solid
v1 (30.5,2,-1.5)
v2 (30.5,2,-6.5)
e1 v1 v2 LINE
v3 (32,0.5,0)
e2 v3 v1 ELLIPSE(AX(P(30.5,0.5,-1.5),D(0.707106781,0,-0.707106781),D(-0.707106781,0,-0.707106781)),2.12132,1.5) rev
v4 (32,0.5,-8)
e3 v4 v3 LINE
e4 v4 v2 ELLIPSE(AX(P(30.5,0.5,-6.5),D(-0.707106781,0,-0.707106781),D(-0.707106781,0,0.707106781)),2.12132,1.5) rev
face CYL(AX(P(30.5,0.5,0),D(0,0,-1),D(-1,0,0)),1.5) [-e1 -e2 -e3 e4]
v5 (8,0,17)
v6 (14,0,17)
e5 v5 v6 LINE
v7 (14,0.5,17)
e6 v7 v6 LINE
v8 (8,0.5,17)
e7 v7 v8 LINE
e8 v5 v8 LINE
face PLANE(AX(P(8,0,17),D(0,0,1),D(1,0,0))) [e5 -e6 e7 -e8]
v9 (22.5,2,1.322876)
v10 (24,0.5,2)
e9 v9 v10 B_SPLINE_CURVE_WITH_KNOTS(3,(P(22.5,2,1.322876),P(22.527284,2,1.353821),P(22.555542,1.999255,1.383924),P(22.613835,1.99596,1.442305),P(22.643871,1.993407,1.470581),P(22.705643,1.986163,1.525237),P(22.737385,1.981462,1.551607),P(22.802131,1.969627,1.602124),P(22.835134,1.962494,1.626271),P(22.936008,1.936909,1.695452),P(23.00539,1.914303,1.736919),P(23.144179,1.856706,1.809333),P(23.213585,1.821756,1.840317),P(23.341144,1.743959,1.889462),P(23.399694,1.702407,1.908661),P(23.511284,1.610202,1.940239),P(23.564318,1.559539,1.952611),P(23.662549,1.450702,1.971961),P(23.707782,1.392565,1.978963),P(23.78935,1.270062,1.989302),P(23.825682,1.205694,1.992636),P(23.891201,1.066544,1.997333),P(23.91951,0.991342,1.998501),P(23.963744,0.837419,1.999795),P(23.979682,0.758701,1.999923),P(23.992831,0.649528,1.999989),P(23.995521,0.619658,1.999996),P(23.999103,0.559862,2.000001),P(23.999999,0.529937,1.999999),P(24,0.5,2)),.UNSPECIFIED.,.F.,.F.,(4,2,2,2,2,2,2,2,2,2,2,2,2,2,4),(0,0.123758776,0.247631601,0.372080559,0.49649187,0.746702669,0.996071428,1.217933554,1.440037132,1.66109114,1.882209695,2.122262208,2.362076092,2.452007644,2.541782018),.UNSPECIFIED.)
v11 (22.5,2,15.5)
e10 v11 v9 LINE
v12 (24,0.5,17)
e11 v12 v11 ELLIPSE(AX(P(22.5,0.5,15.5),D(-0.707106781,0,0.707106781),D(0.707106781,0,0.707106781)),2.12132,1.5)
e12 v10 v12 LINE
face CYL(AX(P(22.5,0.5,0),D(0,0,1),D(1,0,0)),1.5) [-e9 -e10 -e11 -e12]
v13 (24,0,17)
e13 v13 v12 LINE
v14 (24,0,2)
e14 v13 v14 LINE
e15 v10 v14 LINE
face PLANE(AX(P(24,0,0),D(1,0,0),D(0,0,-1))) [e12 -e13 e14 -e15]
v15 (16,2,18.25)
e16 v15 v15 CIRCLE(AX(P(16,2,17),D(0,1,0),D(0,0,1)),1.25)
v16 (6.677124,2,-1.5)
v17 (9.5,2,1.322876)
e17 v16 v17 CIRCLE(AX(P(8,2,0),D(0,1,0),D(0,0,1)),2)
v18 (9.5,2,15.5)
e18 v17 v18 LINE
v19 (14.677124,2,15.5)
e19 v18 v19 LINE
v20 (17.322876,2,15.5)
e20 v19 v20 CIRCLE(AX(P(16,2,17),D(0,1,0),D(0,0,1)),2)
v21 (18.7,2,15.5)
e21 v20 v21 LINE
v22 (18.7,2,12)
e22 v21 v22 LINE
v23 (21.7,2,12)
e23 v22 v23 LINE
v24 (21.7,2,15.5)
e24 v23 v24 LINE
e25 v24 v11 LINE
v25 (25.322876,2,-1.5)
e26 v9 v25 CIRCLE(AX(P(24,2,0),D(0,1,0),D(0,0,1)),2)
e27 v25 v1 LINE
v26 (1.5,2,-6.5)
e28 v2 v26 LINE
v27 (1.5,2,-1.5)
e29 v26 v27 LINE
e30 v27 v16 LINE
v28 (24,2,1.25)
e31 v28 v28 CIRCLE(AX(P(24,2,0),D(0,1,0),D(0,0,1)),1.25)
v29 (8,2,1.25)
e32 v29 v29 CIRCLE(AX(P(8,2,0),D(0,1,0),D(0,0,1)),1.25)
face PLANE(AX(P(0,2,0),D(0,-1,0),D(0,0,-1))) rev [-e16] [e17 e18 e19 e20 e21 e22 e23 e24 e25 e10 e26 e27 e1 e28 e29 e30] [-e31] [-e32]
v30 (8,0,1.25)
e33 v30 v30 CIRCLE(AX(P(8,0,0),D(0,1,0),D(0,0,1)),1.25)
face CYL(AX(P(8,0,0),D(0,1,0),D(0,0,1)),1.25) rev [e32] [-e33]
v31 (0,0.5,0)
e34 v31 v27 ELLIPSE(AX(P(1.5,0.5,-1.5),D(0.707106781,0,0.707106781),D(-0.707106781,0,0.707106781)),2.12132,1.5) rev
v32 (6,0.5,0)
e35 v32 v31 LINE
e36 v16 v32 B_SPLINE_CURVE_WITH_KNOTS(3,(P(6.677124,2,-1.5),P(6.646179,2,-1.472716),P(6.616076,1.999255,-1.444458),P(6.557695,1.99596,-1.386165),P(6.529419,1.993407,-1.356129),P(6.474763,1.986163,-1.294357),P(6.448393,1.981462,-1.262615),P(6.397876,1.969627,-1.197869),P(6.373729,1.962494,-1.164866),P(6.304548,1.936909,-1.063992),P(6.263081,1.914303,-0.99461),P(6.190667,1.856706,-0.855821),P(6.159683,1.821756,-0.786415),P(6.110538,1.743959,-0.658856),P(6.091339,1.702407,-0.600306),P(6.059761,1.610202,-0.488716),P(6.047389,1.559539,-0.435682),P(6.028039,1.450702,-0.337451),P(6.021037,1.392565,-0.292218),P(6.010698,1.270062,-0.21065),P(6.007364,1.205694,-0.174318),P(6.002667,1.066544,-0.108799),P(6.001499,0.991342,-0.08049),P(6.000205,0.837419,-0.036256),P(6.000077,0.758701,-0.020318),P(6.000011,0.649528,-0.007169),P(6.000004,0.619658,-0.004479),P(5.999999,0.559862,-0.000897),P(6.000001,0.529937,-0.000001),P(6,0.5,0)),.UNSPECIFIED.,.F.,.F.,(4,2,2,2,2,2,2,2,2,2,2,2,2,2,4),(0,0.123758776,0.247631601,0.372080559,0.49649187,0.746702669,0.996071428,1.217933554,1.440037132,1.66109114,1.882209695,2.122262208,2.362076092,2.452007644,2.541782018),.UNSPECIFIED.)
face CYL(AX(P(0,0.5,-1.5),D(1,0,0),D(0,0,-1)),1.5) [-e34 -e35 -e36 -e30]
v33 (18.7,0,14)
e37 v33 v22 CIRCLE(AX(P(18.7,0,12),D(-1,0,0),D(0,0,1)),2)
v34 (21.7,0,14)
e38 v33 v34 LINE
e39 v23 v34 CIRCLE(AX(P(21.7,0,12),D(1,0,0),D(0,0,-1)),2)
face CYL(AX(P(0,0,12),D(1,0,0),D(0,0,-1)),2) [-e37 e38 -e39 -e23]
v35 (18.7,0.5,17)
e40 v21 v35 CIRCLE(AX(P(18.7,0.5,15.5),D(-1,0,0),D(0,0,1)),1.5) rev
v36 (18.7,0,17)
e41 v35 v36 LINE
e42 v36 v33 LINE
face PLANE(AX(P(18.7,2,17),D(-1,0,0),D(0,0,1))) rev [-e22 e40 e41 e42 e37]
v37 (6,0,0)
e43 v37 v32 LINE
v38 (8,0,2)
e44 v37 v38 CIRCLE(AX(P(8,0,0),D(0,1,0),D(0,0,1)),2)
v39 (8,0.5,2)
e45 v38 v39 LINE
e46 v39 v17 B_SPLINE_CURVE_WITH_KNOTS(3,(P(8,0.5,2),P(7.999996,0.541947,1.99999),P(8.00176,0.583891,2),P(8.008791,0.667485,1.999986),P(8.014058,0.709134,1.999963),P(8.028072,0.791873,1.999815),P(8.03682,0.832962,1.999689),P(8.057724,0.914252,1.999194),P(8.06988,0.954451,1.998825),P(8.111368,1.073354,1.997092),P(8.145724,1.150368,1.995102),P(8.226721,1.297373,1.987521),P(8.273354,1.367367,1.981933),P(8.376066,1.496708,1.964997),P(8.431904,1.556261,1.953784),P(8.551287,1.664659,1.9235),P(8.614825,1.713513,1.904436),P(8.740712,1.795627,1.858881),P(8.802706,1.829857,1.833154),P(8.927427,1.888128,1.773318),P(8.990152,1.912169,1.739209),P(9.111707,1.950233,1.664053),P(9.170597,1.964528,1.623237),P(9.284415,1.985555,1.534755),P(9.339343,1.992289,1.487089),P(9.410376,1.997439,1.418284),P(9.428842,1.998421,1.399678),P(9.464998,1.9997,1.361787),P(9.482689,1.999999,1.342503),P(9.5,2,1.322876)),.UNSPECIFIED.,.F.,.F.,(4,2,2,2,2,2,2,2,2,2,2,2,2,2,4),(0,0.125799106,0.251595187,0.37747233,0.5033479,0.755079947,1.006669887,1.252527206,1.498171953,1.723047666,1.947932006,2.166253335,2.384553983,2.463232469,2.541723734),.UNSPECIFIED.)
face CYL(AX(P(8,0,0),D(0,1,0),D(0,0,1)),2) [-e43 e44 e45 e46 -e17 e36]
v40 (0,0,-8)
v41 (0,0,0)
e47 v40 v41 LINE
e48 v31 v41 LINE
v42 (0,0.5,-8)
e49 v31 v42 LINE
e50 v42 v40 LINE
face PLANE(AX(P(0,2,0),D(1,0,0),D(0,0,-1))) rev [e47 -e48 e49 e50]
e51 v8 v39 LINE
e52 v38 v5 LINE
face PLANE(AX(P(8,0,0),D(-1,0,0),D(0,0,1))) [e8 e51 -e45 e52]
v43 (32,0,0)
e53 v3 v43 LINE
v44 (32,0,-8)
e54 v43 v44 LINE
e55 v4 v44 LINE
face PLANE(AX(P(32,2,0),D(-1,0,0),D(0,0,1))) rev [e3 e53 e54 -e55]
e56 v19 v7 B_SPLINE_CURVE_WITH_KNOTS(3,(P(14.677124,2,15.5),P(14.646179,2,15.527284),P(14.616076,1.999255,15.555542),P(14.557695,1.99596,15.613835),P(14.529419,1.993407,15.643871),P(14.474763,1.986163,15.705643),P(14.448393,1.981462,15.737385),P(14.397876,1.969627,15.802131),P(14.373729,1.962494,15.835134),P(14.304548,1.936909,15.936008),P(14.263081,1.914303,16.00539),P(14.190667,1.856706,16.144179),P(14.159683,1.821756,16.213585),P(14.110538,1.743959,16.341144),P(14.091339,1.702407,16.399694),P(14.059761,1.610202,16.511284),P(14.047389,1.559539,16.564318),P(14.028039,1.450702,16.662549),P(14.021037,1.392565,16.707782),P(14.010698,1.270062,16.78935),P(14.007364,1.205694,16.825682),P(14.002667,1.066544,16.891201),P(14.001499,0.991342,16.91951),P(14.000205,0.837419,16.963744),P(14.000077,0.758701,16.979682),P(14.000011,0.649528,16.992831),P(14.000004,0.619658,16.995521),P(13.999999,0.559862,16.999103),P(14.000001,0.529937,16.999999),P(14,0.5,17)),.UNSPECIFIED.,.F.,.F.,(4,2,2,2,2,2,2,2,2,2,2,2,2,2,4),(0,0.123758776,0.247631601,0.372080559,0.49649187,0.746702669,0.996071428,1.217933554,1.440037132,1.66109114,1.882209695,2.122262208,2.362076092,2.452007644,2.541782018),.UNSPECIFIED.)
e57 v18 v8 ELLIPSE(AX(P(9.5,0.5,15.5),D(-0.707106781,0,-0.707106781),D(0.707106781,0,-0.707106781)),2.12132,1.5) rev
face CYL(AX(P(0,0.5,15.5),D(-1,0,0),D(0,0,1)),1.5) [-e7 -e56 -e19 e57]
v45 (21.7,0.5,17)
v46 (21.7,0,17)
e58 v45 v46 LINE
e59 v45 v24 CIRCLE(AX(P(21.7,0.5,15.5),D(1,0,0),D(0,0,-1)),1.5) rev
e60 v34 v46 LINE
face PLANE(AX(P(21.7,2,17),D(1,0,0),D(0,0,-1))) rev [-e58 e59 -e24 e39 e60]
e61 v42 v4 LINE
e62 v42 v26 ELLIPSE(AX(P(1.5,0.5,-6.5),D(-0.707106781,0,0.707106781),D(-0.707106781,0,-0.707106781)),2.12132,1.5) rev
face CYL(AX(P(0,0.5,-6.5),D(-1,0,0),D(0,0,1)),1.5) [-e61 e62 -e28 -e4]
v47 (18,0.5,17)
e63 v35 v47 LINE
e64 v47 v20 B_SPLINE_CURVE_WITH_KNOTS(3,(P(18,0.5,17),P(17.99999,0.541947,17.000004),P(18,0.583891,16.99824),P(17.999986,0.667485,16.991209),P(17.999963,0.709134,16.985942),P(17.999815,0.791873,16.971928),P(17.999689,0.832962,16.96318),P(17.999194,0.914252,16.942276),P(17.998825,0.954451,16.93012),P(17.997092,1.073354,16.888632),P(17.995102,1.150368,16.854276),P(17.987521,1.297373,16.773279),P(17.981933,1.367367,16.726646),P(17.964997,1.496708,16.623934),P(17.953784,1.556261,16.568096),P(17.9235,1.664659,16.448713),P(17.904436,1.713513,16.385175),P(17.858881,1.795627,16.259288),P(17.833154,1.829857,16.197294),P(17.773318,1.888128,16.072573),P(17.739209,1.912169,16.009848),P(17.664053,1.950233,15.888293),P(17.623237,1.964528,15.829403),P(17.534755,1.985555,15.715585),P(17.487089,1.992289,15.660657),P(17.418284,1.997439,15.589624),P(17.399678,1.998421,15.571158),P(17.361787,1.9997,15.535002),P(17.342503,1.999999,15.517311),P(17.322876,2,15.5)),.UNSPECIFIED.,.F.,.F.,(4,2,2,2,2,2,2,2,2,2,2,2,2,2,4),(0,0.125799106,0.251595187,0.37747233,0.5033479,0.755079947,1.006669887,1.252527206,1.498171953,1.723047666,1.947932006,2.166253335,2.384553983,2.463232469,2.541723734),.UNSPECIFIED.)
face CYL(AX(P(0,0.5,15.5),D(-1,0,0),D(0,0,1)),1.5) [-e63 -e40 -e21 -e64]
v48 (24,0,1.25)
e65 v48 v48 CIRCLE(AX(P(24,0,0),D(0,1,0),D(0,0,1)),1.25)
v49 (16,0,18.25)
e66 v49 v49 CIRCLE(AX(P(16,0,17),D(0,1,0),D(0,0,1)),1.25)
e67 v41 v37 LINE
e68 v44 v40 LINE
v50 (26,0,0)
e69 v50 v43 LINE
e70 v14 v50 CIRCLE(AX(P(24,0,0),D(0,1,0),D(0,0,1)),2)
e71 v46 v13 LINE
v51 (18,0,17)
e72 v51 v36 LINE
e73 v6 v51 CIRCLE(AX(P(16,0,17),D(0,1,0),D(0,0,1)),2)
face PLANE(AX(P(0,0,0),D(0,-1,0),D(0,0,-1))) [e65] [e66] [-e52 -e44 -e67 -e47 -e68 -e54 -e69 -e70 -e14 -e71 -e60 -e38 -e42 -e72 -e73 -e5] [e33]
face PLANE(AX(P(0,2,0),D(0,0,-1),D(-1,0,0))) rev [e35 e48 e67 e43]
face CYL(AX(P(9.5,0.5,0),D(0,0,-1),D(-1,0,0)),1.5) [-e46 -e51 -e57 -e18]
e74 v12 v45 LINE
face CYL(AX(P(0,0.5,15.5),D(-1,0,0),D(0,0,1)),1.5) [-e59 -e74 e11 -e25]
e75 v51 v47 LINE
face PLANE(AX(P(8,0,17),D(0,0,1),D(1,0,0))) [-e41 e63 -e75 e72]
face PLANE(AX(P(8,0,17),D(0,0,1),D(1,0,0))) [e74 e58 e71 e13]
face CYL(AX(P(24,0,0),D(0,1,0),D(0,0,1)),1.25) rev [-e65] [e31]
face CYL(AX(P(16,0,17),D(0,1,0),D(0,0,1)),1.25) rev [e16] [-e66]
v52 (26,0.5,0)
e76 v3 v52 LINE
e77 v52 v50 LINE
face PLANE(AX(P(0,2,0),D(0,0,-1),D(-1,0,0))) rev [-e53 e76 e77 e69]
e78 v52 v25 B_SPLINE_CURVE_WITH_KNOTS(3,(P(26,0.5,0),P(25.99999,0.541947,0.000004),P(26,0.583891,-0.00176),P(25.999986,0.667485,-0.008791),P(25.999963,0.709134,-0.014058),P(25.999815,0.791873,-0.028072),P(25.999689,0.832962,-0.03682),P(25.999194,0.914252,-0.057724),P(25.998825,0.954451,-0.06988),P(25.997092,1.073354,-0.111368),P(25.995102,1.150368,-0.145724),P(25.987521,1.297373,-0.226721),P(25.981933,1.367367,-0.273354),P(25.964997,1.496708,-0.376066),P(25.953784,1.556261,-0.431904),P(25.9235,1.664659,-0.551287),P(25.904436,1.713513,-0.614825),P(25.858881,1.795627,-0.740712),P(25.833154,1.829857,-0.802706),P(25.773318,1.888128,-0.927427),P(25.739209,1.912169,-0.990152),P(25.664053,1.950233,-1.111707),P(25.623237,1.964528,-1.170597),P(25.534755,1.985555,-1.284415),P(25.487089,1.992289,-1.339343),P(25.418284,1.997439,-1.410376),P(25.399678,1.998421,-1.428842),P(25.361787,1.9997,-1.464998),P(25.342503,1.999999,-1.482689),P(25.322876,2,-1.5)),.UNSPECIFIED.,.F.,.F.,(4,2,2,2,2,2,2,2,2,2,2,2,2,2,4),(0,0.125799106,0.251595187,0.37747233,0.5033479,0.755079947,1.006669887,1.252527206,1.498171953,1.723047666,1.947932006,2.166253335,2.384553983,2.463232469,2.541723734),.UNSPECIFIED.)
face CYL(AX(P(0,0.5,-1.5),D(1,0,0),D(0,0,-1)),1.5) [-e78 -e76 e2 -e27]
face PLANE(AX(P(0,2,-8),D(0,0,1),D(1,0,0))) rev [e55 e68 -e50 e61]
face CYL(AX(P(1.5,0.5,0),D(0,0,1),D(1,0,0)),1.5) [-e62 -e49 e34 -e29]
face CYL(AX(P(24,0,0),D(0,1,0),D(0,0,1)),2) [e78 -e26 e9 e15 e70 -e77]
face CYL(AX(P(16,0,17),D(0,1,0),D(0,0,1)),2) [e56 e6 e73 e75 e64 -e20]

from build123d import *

# Parameters (mm, degrees)
ESQUISSE1_W             = 32
ESQUISSE1_H             = 8
BOSS_EXTRU_1_DEPTH      = 2
BOSS_EXTRU_2_DEPTH      = 2
ESQUISSE3_R             = 1.9999999999999996
ESQUISSE3_R_2           = 2.000000000000003
ESQUISSE3_R_3           = 1.9999999999999991
BOSS_EXTRU_3_DEPTH      = 2
ESQUISSE4_R             = 1.2499999999999991
ESQUISSE4_R_2           = 1.250000000000001
ESQUISSE4_R_3           = 1.2500000000000013
ENL_V_MAT_EXTRU_1_DEPTH = 2
CONG_1_R                = 1.5
ENL_V_MAT_EXTRU_2_DEPTH = 38.26929044937668
CONG_2_R                = 2


with BuildPart() as part:
    # Esquisse1 → Boss.-Extru.1 (new body)
    with BuildSketch(Plane(origin=(0, 0, 0), x_dir=(1, 0, 0), z_dir=(0, 1, 0))):
        with Locations((16, 4)):
            Rectangle(ESQUISSE1_W, ESQUISSE1_H)
    extrude(amount=BOSS_EXTRU_1_DEPTH)

    # Esquisse2 → Boss.-Extru.2 (add)
    with BuildSketch(Plane(origin=(0, 2, 0), x_dir=(1, 0, 0), z_dir=(0, 1, 0))):
        Polygon((8.000000000000002, 4.5e-16), (24, 2.41e-15), (24.000000000000004, -17), (8.000000000000004, -17), align=None)
    extrude(amount=-BOSS_EXTRU_2_DEPTH)

    # Esquisse3 → Boss.-Extru.3 (add)
    with BuildSketch(Plane(origin=(0, 2, 0), x_dir=(1, 0, 0), z_dir=(0, 1, 0))):
        with Locations((8.000000000000002, 0)):
            Circle(ESQUISSE3_R)
        with Locations((24, 2.41e-15)):
            Circle(ESQUISSE3_R_2)
        with Locations((16.000000000000004, -17)):
            Circle(ESQUISSE3_R_3)
    extrude(amount=-BOSS_EXTRU_3_DEPTH)

    # Esquisse4 → Enlèv. mat.-Extru.1 (cut)
    with BuildSketch(Plane(origin=(0, 2, 0), x_dir=(1, 0, 0), z_dir=(0, 1, 0))):
        with Locations(Location((8.000000000000002, 0, 0), (0, 0, 270))):
            Circle(ESQUISSE4_R)
        with Locations(Location((24, 2.41e-15, 0), (0, 0, 270))):
            Circle(ESQUISSE4_R_2)
        with Locations(Location((16.000000000000004, -17, 0), (0, 0, 270))):
            Circle(ESQUISSE4_R_3)
    extrude(amount=-ENL_V_MAT_EXTRU_1_DEPTH, mode=Mode.SUBTRACT)

    # Congé1
    cong_1_edges = [part.edges().sort_by_distance(p)[0] for p in [
        (32, 2, -4),
        (16, 2, -8),
        (11.000000000000004, 2, 17),
        (24.000000000000004, 2, 9.500000000000002),
        (8.000000000000004, 2, 9.5),
        (29, 2, 0),
        (0, 2, -4),
        (21.000000000000004, 2, 17),
        (3.000000000000001, 2, 0),
    ]]
    fillet(cong_1_edges, radius=CONG_1_R)

    # Esquisse5 → Enlèv. mat.-Extru.2 (cut, through all)
    with BuildSketch(Plane.XZ):
        Polygon((21.700000000000003, 17), (18.700000000000003, 17), (18.70000000000001, 14.000000000000002), (21.700000000000006, 14.000000000000002), align=None)
    extrude(amount=-ENL_V_MAT_EXTRU_2_DEPTH, mode=Mode.SUBTRACT)

    # Congé2
    cong_2_edges = [part.edges().sort_by_distance(p)[0] for p in [
        (20.20000000000001, 2, 14),
    ]]
    fillet(cong_2_edges, radius=CONG_2_R - 0.0001)  # a hair under: the kernel refuses the full size


solid = part.part
